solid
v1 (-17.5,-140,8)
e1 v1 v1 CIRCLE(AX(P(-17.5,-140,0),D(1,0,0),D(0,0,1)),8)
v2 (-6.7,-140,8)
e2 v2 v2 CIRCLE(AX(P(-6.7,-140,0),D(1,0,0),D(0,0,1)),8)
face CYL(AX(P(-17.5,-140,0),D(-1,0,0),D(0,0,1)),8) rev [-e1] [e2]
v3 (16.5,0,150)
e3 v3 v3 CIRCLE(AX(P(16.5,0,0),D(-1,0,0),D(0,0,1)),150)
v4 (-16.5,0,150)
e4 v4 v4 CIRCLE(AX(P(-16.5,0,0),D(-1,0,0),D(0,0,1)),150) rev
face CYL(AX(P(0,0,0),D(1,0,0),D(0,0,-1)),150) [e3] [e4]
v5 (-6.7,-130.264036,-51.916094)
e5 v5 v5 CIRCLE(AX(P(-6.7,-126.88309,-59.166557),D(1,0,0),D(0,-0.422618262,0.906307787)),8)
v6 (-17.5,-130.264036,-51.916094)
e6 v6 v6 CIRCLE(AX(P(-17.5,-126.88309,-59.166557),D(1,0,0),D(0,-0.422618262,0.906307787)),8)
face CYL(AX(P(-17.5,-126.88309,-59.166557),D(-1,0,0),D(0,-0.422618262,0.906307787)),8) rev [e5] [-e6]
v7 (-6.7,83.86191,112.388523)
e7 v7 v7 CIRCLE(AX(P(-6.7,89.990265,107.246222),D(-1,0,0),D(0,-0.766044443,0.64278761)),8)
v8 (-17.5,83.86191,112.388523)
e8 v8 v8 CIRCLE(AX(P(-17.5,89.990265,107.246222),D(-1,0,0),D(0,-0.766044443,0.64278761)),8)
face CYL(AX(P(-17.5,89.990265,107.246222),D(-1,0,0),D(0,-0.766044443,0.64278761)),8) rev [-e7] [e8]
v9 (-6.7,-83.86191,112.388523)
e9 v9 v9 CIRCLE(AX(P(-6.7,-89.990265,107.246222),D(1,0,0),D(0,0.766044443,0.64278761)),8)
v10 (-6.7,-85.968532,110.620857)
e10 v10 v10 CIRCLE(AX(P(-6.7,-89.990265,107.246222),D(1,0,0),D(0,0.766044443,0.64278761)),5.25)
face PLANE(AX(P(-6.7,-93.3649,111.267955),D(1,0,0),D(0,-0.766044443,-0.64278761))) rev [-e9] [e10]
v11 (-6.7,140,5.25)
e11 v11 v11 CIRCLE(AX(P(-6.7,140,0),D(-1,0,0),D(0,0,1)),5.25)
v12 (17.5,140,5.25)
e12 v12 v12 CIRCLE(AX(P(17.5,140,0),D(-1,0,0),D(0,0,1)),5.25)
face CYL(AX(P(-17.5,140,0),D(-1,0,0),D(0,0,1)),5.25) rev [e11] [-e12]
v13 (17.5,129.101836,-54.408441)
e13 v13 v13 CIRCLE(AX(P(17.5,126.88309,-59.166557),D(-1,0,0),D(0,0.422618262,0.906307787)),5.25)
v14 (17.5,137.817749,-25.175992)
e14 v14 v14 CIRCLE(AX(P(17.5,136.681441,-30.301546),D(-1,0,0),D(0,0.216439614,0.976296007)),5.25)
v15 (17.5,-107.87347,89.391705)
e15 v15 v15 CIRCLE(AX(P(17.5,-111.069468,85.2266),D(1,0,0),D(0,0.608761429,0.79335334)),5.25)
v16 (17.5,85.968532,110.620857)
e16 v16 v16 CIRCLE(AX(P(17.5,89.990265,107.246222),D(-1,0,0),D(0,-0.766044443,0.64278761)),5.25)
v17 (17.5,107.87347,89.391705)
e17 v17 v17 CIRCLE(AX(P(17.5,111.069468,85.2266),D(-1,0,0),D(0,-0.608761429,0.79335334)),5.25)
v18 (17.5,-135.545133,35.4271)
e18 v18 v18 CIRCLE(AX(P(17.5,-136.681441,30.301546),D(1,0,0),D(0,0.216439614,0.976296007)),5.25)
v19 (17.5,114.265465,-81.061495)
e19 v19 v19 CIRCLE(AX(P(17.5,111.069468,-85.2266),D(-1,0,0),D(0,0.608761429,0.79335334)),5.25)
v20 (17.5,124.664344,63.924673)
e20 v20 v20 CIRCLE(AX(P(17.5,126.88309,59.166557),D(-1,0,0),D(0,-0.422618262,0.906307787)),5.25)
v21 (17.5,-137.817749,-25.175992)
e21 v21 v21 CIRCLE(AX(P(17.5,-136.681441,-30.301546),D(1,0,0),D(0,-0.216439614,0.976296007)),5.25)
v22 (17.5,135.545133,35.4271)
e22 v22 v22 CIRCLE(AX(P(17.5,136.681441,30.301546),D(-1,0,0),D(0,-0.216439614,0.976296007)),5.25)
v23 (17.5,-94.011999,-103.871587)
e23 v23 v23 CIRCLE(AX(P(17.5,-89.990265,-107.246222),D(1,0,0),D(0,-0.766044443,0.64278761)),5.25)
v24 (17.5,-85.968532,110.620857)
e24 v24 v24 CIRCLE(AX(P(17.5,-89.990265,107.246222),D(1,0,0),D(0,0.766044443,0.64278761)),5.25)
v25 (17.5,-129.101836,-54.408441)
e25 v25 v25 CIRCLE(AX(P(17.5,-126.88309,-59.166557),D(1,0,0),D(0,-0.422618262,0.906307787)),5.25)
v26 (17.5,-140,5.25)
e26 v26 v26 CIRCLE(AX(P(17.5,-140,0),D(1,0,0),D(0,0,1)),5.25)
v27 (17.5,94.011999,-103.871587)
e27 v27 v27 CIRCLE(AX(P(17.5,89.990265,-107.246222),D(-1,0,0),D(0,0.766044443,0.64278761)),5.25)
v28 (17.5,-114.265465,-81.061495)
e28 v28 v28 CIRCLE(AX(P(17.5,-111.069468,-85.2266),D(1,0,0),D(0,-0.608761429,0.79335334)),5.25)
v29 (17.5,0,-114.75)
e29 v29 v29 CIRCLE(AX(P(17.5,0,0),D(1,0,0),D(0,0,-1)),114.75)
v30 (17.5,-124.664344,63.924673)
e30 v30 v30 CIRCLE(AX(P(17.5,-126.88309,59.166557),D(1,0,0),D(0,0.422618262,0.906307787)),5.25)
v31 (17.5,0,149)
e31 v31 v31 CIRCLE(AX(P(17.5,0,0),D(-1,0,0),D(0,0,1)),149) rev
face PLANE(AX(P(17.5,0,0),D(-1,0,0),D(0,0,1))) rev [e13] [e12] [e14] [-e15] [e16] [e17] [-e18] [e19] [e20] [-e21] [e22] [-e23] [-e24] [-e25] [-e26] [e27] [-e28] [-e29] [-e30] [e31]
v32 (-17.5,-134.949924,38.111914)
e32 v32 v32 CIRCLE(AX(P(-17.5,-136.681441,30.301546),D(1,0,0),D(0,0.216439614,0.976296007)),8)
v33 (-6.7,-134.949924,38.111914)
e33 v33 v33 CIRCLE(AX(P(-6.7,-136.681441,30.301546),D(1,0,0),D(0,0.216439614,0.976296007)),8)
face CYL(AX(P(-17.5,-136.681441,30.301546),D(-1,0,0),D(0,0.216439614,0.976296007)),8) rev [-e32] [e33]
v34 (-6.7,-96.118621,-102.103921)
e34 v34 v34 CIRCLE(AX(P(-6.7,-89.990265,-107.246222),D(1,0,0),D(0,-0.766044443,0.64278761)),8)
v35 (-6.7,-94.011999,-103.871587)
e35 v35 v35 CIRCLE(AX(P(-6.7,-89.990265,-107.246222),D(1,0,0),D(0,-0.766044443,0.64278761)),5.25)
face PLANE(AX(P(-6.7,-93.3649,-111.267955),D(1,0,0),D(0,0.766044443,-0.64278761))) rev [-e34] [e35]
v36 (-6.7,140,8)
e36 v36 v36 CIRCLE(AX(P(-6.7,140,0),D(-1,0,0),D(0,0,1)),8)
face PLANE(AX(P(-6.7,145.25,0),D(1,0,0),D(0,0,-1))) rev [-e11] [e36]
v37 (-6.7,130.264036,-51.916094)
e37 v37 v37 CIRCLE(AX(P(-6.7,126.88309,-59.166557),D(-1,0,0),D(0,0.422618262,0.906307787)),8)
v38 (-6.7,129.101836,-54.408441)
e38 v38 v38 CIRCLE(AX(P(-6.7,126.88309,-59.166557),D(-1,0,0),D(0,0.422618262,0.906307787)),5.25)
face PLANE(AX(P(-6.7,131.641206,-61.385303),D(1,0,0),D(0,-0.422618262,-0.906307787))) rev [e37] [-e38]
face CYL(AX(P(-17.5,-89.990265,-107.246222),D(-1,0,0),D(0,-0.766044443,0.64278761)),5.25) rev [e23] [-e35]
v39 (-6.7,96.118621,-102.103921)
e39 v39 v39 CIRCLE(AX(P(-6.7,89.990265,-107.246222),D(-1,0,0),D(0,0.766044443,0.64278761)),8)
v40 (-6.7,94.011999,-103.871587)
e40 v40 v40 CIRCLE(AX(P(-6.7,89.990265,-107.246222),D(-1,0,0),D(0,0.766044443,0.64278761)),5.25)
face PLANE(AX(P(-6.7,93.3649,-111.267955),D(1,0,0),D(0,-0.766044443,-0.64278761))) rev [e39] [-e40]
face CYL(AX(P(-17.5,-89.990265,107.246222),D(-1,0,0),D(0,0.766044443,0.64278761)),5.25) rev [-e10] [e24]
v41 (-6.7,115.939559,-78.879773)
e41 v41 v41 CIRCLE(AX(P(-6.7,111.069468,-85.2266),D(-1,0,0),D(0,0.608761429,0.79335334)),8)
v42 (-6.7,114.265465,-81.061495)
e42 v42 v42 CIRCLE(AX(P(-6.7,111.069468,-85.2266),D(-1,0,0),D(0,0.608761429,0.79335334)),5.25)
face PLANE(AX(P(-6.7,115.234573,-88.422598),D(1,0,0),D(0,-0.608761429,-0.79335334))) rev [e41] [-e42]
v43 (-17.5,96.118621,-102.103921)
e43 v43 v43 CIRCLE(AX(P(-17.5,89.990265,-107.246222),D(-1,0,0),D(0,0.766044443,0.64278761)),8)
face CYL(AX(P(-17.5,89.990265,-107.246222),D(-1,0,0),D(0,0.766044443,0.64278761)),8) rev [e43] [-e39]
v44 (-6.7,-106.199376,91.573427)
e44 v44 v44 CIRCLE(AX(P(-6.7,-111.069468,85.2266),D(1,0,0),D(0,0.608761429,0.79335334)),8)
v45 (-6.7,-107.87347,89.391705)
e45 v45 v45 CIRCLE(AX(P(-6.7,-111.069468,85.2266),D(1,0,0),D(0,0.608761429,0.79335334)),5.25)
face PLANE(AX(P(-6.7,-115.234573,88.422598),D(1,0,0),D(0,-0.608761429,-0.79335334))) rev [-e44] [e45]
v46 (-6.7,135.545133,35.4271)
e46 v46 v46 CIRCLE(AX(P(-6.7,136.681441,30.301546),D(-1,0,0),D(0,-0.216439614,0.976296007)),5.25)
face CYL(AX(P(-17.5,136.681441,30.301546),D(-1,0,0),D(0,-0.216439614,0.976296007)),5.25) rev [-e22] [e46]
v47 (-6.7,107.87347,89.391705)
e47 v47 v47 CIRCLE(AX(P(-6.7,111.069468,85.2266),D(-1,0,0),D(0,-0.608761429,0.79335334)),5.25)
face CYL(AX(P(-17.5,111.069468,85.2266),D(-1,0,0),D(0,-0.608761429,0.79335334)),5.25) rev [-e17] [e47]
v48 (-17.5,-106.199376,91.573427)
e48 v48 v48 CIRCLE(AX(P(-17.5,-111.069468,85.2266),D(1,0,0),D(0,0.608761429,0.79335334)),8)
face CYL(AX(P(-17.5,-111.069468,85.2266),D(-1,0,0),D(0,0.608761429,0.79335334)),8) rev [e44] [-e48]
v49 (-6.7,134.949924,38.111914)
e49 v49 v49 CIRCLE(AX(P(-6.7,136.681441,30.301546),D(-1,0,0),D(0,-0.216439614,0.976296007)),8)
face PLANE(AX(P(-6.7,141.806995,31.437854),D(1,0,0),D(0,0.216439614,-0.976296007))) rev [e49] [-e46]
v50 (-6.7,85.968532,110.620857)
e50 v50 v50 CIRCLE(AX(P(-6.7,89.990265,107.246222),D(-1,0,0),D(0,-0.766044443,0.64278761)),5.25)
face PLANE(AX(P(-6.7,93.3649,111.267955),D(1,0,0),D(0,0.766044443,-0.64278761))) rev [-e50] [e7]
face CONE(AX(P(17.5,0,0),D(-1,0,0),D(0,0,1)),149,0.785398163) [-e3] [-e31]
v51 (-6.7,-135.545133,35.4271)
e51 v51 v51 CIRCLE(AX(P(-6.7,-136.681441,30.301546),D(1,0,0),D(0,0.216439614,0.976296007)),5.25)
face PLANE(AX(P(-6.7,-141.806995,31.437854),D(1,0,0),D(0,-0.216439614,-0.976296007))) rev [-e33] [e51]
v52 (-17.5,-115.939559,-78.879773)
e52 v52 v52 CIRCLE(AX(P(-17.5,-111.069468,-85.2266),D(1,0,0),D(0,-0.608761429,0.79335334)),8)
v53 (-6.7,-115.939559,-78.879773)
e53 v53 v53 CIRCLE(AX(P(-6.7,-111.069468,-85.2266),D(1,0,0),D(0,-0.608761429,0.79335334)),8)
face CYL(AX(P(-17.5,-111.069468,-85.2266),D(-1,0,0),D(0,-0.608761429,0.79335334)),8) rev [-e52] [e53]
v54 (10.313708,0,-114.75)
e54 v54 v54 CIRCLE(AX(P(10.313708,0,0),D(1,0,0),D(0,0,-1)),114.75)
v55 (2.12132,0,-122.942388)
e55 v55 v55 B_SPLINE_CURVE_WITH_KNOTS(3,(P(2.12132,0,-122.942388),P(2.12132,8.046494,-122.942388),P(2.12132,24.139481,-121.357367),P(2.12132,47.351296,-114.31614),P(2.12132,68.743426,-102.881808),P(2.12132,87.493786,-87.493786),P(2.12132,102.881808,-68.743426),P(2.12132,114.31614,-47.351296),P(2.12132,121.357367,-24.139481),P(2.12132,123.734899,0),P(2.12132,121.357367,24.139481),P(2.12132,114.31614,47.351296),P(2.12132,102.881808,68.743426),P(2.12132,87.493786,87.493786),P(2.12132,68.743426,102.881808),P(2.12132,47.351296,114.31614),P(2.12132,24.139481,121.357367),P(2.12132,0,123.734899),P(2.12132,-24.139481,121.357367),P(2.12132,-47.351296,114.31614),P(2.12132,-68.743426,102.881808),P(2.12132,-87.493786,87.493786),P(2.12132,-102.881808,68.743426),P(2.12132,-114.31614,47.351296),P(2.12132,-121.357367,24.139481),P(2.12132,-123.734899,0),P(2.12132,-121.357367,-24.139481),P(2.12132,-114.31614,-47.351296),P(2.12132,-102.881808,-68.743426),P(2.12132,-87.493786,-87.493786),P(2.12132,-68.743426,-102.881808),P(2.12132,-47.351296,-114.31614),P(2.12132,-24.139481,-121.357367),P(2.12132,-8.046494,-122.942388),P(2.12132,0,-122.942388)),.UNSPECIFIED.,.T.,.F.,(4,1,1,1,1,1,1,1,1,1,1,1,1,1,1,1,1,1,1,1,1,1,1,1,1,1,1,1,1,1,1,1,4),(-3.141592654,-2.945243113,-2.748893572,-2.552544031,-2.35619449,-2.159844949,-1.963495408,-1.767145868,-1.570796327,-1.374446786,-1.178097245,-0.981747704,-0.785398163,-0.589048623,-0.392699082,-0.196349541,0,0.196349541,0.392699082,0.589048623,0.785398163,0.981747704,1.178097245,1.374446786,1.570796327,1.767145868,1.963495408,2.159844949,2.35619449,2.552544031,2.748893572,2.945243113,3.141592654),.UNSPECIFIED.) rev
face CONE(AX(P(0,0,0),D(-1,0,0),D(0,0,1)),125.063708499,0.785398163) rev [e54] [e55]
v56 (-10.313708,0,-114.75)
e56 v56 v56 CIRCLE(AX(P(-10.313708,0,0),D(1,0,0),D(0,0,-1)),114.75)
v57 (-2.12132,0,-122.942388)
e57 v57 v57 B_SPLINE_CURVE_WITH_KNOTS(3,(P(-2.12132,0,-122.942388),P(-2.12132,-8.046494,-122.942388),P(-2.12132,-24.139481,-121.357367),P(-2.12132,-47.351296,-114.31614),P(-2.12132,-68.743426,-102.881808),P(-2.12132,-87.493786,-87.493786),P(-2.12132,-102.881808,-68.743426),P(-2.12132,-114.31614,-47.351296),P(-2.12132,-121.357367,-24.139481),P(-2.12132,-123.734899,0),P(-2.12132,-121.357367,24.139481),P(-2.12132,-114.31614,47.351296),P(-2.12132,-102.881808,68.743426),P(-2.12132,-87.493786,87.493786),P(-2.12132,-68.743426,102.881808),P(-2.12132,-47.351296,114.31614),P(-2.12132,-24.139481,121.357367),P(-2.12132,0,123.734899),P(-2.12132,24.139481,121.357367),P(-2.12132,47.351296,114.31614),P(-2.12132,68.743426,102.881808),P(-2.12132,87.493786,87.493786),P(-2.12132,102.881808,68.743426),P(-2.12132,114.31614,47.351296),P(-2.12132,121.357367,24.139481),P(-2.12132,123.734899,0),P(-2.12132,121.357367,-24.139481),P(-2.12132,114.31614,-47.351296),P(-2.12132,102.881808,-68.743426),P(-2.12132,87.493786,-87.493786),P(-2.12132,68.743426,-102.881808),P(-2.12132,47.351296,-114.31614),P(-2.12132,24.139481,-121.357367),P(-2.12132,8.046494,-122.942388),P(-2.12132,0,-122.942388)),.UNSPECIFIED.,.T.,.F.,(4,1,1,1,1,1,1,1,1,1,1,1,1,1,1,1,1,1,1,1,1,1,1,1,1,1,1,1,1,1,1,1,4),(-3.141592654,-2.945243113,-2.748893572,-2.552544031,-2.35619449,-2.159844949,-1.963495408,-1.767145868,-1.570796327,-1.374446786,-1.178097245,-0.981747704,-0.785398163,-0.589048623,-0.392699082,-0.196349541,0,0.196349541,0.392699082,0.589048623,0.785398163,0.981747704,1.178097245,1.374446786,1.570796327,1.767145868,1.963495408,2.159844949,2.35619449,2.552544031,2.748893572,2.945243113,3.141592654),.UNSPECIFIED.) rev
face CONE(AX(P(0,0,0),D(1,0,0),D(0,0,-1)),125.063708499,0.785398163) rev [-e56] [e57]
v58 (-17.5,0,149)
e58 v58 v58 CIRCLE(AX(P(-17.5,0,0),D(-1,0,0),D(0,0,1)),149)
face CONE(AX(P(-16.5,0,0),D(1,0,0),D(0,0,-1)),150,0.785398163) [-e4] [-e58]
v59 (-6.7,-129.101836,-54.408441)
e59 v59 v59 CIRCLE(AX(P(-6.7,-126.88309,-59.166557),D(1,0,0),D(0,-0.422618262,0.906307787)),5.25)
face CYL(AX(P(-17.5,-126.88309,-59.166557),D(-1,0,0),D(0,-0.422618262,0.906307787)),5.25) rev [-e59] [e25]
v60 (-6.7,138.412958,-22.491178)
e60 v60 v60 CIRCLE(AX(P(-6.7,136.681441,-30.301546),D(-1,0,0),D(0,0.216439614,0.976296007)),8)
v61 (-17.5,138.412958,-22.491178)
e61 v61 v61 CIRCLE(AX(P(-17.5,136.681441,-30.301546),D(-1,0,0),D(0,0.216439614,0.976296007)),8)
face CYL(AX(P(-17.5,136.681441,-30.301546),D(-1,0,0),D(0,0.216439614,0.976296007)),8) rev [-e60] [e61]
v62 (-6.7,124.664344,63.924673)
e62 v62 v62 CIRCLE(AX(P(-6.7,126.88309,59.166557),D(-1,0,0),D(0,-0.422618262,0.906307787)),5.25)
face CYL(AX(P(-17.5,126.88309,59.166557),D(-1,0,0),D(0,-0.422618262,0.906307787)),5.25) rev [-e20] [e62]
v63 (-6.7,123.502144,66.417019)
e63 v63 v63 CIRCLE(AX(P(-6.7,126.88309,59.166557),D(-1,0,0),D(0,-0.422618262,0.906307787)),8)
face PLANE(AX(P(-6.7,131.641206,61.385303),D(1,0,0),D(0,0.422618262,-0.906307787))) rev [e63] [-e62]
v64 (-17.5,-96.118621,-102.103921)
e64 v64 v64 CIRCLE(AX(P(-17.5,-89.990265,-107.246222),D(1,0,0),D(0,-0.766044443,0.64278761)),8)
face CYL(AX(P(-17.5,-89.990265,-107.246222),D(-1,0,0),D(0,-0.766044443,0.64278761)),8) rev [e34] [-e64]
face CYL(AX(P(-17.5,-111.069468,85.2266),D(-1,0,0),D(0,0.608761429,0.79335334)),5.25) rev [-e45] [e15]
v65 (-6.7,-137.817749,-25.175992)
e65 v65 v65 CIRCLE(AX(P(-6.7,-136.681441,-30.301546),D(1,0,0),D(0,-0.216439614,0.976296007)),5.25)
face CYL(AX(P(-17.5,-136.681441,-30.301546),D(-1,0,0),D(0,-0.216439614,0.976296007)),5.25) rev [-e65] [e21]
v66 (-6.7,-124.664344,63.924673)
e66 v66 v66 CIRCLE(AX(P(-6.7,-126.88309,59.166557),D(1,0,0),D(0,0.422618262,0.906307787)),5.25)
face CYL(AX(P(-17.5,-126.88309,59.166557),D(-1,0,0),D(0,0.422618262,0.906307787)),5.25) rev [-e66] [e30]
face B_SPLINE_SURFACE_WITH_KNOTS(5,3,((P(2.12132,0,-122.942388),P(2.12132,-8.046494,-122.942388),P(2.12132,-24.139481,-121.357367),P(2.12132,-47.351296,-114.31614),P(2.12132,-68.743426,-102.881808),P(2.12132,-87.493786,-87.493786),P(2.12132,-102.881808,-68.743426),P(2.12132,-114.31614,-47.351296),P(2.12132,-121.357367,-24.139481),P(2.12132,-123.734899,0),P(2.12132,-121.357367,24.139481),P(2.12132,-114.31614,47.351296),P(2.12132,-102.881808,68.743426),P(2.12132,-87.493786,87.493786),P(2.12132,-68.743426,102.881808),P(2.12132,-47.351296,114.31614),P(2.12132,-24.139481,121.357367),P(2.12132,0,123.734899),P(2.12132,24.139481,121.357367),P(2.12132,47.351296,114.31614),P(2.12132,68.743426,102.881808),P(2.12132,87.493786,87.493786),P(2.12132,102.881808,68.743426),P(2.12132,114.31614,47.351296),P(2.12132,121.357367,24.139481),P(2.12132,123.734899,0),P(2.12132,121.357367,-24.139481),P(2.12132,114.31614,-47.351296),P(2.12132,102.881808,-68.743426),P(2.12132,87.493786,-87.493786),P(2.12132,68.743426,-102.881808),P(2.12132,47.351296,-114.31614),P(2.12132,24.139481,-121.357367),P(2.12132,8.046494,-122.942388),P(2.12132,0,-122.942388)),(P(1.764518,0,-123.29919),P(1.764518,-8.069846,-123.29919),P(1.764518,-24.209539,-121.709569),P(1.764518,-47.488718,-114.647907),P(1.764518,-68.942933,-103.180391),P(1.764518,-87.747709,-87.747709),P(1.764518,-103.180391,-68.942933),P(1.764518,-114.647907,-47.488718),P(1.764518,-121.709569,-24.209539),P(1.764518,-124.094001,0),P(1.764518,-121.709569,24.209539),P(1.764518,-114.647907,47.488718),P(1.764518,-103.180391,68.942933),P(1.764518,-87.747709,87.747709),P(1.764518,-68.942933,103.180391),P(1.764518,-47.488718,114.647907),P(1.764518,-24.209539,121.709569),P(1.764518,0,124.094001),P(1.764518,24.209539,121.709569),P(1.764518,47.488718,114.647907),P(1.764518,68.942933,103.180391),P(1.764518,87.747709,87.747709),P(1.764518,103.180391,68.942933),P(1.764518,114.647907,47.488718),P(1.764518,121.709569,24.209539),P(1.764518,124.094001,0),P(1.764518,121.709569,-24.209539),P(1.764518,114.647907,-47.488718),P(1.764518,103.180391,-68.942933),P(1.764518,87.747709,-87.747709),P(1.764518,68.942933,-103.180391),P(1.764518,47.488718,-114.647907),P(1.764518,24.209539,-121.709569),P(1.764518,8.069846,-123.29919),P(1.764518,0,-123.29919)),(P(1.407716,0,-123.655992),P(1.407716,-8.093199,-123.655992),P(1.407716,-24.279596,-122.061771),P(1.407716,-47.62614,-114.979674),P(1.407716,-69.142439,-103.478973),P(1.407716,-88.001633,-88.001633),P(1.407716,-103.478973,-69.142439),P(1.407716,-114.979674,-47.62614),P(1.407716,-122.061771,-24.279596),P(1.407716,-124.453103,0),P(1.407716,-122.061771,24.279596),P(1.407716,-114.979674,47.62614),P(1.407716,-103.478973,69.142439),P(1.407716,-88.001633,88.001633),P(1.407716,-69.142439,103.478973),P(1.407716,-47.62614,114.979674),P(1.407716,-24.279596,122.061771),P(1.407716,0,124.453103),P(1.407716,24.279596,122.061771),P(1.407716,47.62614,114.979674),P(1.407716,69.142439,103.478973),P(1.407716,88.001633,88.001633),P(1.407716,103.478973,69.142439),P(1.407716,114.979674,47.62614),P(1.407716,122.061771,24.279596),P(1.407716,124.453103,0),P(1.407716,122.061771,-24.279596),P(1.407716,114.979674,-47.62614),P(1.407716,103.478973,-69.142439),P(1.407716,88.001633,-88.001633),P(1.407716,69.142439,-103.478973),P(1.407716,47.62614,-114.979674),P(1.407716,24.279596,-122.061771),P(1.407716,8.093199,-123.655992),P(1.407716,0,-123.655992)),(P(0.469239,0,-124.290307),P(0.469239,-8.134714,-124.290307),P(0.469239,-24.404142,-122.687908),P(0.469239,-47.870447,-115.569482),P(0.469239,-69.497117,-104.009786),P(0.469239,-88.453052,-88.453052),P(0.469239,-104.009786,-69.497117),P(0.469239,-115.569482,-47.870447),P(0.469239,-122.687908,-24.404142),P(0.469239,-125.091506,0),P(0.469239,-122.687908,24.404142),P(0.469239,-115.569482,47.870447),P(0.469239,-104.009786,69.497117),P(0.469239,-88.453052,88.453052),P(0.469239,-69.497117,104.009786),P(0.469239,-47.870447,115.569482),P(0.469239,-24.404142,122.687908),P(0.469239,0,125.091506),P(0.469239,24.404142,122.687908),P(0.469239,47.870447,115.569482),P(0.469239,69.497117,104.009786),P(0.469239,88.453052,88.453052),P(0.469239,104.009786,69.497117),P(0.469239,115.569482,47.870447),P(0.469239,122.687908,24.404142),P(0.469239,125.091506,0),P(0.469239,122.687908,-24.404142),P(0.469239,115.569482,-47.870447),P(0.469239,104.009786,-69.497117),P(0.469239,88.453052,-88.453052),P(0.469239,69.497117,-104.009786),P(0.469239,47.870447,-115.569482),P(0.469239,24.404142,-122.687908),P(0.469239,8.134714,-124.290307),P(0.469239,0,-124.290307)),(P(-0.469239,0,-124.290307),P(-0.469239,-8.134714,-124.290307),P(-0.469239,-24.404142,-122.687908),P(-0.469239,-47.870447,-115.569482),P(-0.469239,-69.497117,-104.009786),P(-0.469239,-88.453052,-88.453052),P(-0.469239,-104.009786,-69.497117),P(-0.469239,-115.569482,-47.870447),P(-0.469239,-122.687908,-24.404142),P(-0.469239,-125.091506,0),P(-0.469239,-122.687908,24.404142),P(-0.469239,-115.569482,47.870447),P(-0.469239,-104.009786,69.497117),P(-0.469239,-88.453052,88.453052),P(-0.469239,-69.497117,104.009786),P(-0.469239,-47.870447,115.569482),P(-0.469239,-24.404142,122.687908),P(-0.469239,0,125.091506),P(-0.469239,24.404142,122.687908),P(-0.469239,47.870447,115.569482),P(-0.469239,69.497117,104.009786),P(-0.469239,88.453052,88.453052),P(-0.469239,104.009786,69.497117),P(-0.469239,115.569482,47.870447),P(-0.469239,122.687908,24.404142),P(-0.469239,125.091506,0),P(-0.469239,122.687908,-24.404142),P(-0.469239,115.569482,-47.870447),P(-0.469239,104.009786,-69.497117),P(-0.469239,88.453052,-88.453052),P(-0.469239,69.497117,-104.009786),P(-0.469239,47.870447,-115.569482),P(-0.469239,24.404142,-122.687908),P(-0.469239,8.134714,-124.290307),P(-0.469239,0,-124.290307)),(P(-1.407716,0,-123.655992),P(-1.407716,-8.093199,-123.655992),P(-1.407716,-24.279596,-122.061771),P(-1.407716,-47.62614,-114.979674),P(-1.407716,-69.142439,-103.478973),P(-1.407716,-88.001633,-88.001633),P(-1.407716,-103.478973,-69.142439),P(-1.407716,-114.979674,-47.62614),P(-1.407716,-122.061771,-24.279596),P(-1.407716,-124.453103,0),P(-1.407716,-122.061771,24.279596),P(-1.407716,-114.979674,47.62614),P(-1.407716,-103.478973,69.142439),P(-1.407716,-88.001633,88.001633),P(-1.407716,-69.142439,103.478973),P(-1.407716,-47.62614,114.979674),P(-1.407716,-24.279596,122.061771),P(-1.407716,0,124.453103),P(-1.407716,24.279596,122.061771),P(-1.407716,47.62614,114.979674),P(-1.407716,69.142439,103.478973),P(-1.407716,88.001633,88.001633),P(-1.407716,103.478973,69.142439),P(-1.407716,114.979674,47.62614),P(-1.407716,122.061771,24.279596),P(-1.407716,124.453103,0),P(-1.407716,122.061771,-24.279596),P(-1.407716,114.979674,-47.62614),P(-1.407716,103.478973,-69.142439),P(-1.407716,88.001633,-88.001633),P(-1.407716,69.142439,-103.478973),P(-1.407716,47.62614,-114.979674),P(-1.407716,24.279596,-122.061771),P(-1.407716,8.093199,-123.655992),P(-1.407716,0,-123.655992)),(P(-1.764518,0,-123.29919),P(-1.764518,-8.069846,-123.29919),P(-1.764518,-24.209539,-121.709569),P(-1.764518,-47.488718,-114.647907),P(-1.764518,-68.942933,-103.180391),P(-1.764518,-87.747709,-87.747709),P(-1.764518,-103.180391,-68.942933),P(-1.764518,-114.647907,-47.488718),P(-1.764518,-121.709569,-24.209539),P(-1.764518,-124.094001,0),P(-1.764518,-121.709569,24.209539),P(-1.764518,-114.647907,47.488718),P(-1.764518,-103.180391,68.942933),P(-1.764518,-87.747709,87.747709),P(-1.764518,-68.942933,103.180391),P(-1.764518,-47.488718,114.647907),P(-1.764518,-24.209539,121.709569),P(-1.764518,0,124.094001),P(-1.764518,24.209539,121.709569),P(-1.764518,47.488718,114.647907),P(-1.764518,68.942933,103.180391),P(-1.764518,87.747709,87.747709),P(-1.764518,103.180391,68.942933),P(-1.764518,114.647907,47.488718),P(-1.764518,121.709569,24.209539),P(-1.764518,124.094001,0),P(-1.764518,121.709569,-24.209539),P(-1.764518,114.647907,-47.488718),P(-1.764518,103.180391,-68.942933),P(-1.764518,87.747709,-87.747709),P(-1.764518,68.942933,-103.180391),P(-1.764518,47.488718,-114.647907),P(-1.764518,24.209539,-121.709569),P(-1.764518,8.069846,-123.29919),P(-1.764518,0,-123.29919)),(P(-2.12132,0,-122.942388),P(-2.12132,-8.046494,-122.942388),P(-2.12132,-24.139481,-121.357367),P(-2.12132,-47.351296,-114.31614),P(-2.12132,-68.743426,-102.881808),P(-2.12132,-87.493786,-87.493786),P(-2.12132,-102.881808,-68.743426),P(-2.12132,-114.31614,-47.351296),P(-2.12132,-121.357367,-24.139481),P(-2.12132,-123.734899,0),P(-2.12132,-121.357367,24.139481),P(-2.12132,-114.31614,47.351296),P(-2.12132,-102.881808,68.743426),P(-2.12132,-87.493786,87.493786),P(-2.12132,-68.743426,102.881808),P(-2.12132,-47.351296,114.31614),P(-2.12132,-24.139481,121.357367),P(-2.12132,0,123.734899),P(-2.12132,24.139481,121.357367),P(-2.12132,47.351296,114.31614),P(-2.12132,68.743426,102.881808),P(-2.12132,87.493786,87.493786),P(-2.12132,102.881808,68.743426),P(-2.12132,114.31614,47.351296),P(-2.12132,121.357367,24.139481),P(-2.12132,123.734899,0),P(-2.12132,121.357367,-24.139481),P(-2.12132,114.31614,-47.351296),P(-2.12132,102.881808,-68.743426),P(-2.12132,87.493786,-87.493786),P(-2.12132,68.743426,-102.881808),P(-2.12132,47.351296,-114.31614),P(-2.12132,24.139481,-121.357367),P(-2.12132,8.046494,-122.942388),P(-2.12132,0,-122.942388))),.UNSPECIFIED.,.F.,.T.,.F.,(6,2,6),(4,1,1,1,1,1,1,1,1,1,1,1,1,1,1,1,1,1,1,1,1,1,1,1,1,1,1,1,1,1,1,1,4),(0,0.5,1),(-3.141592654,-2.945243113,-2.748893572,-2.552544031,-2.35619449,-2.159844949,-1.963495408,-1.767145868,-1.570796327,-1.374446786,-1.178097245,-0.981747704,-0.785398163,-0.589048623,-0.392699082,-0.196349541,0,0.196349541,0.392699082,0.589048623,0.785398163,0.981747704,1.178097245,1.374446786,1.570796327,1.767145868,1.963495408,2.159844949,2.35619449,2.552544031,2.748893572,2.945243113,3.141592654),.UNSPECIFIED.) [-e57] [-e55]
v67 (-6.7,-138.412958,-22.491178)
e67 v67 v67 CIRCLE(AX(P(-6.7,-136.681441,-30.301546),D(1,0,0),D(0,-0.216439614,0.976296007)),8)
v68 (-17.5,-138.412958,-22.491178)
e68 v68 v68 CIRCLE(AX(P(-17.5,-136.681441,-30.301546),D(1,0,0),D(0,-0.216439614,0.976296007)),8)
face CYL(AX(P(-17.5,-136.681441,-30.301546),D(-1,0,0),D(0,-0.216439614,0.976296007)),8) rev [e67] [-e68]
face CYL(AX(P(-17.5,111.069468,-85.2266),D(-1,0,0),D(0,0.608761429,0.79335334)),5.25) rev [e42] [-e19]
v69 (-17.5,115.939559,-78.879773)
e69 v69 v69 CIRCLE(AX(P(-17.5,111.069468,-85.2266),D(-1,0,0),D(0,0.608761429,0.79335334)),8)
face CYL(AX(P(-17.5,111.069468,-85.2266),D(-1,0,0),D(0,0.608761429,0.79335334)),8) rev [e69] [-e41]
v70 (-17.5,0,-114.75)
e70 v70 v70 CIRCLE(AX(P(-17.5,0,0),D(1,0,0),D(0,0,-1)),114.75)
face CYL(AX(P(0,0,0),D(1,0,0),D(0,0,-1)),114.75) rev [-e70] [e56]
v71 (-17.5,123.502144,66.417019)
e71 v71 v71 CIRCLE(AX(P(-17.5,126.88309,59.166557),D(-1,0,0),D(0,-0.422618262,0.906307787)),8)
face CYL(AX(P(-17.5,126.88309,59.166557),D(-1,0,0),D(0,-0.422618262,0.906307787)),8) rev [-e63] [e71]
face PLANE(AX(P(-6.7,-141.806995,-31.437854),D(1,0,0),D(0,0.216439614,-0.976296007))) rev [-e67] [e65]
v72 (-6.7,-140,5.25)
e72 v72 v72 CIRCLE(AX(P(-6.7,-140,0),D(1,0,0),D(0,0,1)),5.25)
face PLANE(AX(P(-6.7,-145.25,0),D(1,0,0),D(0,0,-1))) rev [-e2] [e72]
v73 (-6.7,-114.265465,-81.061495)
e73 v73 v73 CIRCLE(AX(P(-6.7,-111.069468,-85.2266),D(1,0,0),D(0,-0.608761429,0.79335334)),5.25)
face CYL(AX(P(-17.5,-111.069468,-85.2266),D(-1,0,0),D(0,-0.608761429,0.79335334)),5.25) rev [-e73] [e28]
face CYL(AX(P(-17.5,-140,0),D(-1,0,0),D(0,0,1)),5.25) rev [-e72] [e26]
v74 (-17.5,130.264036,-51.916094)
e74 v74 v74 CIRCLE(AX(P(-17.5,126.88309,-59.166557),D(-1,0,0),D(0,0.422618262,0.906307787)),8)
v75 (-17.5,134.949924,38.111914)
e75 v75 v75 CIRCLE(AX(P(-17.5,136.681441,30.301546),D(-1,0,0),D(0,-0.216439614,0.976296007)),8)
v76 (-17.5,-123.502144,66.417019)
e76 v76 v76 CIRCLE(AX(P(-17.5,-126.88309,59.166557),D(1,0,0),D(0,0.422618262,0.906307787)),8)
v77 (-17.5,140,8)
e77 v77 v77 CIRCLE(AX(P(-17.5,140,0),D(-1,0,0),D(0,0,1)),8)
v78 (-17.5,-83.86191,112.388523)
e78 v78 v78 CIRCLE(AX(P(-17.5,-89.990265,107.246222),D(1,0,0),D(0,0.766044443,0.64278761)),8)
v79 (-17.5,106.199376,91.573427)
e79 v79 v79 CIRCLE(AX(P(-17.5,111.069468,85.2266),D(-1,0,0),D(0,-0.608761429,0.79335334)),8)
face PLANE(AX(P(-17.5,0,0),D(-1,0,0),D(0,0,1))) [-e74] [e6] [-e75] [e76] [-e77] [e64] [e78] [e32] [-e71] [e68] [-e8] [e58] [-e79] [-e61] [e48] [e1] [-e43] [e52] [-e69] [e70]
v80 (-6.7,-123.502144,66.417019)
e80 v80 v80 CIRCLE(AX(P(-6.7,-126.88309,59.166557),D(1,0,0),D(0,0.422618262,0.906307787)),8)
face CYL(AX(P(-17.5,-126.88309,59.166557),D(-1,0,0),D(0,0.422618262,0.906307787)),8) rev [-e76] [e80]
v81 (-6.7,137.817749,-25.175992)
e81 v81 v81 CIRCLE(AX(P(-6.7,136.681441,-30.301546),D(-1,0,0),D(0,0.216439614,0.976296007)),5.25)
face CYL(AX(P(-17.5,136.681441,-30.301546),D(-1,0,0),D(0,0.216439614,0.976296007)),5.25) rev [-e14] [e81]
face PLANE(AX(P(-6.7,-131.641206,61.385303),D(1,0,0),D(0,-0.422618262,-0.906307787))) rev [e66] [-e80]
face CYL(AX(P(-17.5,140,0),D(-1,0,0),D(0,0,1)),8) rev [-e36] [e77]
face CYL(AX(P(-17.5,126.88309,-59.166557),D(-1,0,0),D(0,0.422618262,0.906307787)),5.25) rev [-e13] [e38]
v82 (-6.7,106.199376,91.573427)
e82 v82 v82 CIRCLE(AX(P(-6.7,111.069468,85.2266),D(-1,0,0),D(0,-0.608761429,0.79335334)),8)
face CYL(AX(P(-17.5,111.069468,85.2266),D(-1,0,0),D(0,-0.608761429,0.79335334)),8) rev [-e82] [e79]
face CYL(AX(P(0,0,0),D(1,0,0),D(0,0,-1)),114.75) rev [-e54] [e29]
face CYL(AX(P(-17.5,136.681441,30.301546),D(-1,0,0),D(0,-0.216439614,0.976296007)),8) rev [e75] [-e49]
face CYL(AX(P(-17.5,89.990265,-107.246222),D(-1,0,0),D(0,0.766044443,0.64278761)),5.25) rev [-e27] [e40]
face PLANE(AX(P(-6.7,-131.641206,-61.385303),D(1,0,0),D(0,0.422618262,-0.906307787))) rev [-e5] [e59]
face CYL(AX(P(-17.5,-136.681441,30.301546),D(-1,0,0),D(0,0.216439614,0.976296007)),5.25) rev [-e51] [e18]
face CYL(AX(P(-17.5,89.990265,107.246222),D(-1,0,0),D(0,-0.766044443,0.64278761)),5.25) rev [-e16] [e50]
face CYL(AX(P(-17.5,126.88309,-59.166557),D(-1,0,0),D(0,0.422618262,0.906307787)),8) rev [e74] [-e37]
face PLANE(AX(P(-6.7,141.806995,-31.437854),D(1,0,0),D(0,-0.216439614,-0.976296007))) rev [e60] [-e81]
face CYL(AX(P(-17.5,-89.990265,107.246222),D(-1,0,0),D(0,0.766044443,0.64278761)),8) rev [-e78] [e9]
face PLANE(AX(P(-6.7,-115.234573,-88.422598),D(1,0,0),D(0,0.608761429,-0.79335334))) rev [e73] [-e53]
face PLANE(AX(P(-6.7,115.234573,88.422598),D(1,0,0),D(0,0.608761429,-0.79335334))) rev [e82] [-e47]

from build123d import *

# Parameters (mm, degrees)
CHAMFER1_SIZE                            = 1
FILLET1_SIZE                             = 3
CBORE_FOR_M10_HEX_HEAD_BOLT2_D           = 10.5
CBORE_FOR_M10_HEX_HEAD_BOLT2_CBORE_D     = 16
CBORE_FOR_M10_HEX_HEAD_BOLT2_CBORE_DEPTH = 10.8
CIRPATTERN1_COUNT                        = 5
CIRPATTERN1_ANGLE                        = 50
CIRPATTERN1_THE_OTHER_WAY_COUNT          = 5
CIRPATTERN1_THE_OTHER_WAY_ANGLE          = 50
MIRROR1_COPY_1_D                         = 10.5
MIRROR1_COPY_1_CBORE_D                   = 16
MIRROR1_COPY_1_CBORE_DEPTH               = 10.8
MIRROR1_COPY_2_D                         = 10.5
MIRROR1_COPY_2_CBORE_D                   = 16
MIRROR1_COPY_2_CBORE_DEPTH               = 10.8
MIRROR1_COPY_3_D                         = 10.5
MIRROR1_COPY_3_CBORE_D                   = 16
MIRROR1_COPY_3_CBORE_DEPTH               = 10.8
MIRROR1_COPY_4_D                         = 10.5
MIRROR1_COPY_4_CBORE_D                   = 16
MIRROR1_COPY_4_CBORE_DEPTH               = 10.8
MIRROR1_COPY_5_D                         = 10.5
MIRROR1_COPY_5_CBORE_D                   = 16
MIRROR1_COPY_5_CBORE_DEPTH               = 10.8
MIRROR1_COPY_6_D                         = 10.5
MIRROR1_COPY_6_CBORE_D                   = 16
MIRROR1_COPY_6_CBORE_DEPTH               = 10.8
MIRROR1_COPY_7_D                         = 10.5
MIRROR1_COPY_7_CBORE_D                   = 16
MIRROR1_COPY_7_CBORE_DEPTH               = 10.8
MIRROR1_COPY_8_D                         = 10.5
MIRROR1_COPY_8_CBORE_D                   = 16
MIRROR1_COPY_8_CBORE_DEPTH               = 10.8


with BuildPart() as part:
    # Sketch1 → Revolve1 (revolve)
    with BuildSketch(Plane.XY, mode=Mode.PRIVATE) as revolve1_sk:
        Polygon((17.5, 114.75), (17.5, 150), (-17.5, 150), (-17.5, 114.75), (-10.313708499, 114.75), (0, 125.063708499), (10.313708499, 114.75), align=None)
    revolve(revolve1_sk.sketch.rotate(Axis((0, 0, 0), (-1, 0, 0)), 90), axis=Axis((0, 0, 0), (-1, 0, 0)))

    # Chamfer1
    chamfer1_edges = [part.edges().sort_by_distance(p)[0] for p in [
        (-17.5, 0, 150),
        (17.5, 0, 150),
    ]]
    chamfer(chamfer1_edges, length=CHAMFER1_SIZE)

    # Fillet1
    # a fillet whose section is not a circle: 3 mm, written as the material it adds along each edge
    with BuildSketch(Plane(origin=(0, 0, 0), x_dir=(0, 0, -1), z_dir=(0, 1, 0))) as fillet1_piece_1:
        with BuildLine():
            add(Edge.make_bspline([(125.063708499 - FILLET1_SIZE * 0.707106781187, -FILLET1_SIZE * 0.707106781187), (125.063708499 - FILLET1_SIZE * 0.588172798365, -FILLET1_SIZE * 0.588172798365), (125.063708499 - FILLET1_SIZE * 0.469238815543, -FILLET1_SIZE * 0.469238815543), (125.063708499 - FILLET1_SIZE * 0.257800623859, -FILLET1_SIZE * 0.156412938514), (125.063708499 - FILLET1_SIZE * 0.257800623859, FILLET1_SIZE * 0.156412938514), (125.063708499 - FILLET1_SIZE * 0.469238815543, FILLET1_SIZE * 0.469238815543), (125.063708499 - FILLET1_SIZE * 0.588172798365, FILLET1_SIZE * 0.588172798365), (125.063708499 - FILLET1_SIZE * 0.707106781187, FILLET1_SIZE * 0.707106781187)], knots=[0, 0, 0, 0, 0, 0, 0.5, 0.5, 1, 1, 1, 1, 1, 1], degree=5))
            Line((125.063708499 - FILLET1_SIZE * 0.707106781187, FILLET1_SIZE * 0.707106781187), (125.063708499, 0))
            Line((125.063708499, 0), (125.063708499 - FILLET1_SIZE * 0.707106781187, -FILLET1_SIZE * 0.707106781187))
        make_face()
    revolve(axis=Axis((0, 0, 0), (-1, 0, 0)))

    # CBORE for M10 Hex Head Bolt2 (through all)
    with Locations(Plane(origin=(-17.5, 140, 0), x_dir=(0, 0, -1), z_dir=(-1, 0, 0))):
        with Locations((0, 0)):
            cbore_for_m10_hex_head_bolt2 = CounterBoreHole(CBORE_FOR_M10_HEX_HEAD_BOLT2_D / 2, CBORE_FOR_M10_HEX_HEAD_BOLT2_CBORE_D / 2, CBORE_FOR_M10_HEX_HEAD_BOLT2_CBORE_DEPTH)

    # CirPattern1: CBORE for M10 Hex Head Bolt2 ×5 about axis
    cirpattern1_axis = Axis((0, 0, 0), (1, 0, 0))
    for i in range(1, CIRPATTERN1_COUNT):
        add(cbore_for_m10_hex_head_bolt2.rotate(cirpattern1_axis, i * CIRPATTERN1_ANGLE / (CIRPATTERN1_COUNT - 1)), mode=Mode.SUBTRACT)

    # CirPattern1 the other way: CBORE for M10 Hex Head Bolt2 ×5 about axis
    cirpattern1_the_other_way_axis = Axis((0, 0, 0), (-1, 0, 0))
    for i in range(1, CIRPATTERN1_THE_OTHER_WAY_COUNT):
        add(cbore_for_m10_hex_head_bolt2.rotate(cirpattern1_the_other_way_axis, i * CIRPATTERN1_THE_OTHER_WAY_ANGLE / (CIRPATTERN1_THE_OTHER_WAY_COUNT - 1)), mode=Mode.SUBTRACT)

    # Mirror1: CBORE for M10 Hex Head Bolt2 across plane
    add(cbore_for_m10_hex_head_bolt2.mirror(Plane.ZX), mode=Mode.SUBTRACT)

    # Mirror1 copy 1 (through all)
    with Locations(Plane(origin=(-17.5, -136.681440997, 30.301545951), x_dir=(0, -0.21643961393810338, -0.9762960071199333), z_dir=(-1, 0, 0))):
        with Locations((0, 0)):
            CounterBoreHole(MIRROR1_COPY_1_D / 2, MIRROR1_COPY_1_CBORE_D / 2, MIRROR1_COPY_1_CBORE_DEPTH)

    # Mirror1 copy 2 (through all)
    with Locations(Plane(origin=(-17.5, -126.883090185, 59.166556644), x_dir=(0, -0.42261826174070033, -0.9063077870366495), z_dir=(-1, 0, 0))):
        with Locations((0, 0)):
            CounterBoreHole(MIRROR1_COPY_2_D / 2, MIRROR1_COPY_2_CBORE_D / 2, MIRROR1_COPY_2_CBORE_DEPTH)

    # Mirror1 copy 3 (through all)
    with Locations(Plane(origin=(-17.5, -111.069467641, 85.226600061), x_dir=(0, -0.6087614290087218, -0.7933533402912343), z_dir=(-1, 0, 0))):
        with Locations((0, 0)):
            CounterBoreHole(MIRROR1_COPY_3_D / 2, MIRROR1_COPY_3_CBORE_D / 2, MIRROR1_COPY_3_CBORE_DEPTH)

    # Mirror1 copy 4 (through all)
    with Locations(Plane(origin=(-17.5, -89.990265356, 107.246222037), x_dir=(0, -0.7660444431189793, -0.6427876096865378), z_dir=(-1, 0, 0))):
        with Locations((0, 0)):
            CounterBoreHole(MIRROR1_COPY_4_D / 2, MIRROR1_COPY_4_CBORE_D / 2, MIRROR1_COPY_4_CBORE_DEPTH)

    # Mirror1 copy 5 (through all)
    with Locations(Plane(origin=(-17.5, -136.681440997, -30.301545951), x_dir=(0, 0.21643961393810338, -0.9762960071199333), z_dir=(-1, 0, 0))):
        with Locations((0, 0)):
            CounterBoreHole(MIRROR1_COPY_5_D / 2, MIRROR1_COPY_5_CBORE_D / 2, MIRROR1_COPY_5_CBORE_DEPTH)

    # Mirror1 copy 6 (through all)
    with Locations(Plane(origin=(-17.5, -126.883090185, -59.166556644), x_dir=(0, 0.42261826174070033, -0.9063077870366495), z_dir=(-1, 0, 0))):
        with Locations((0, 0)):
            CounterBoreHole(MIRROR1_COPY_6_D / 2, MIRROR1_COPY_6_CBORE_D / 2, MIRROR1_COPY_6_CBORE_DEPTH)

    # Mirror1 copy 7 (through all)
    with Locations(Plane(origin=(-17.5, -111.069467641, -85.226600061), x_dir=(0, 0.6087614290087218, -0.7933533402912343), z_dir=(-1, 0, 0))):
        with Locations((0, 0)):
            CounterBoreHole(MIRROR1_COPY_7_D / 2, MIRROR1_COPY_7_CBORE_D / 2, MIRROR1_COPY_7_CBORE_DEPTH)

    # Mirror1 copy 8 (through all)
    with Locations(Plane(origin=(-17.5, -89.990265356, -107.246222037), x_dir=(0, 0.7660444431189793, -0.6427876096865378), z_dir=(-1, 0, 0))):
        with Locations((0, 0)):
            CounterBoreHole(MIRROR1_COPY_8_D / 2, MIRROR1_COPY_8_CBORE_D / 2, MIRROR1_COPY_8_CBORE_DEPTH)


solid = part.part
